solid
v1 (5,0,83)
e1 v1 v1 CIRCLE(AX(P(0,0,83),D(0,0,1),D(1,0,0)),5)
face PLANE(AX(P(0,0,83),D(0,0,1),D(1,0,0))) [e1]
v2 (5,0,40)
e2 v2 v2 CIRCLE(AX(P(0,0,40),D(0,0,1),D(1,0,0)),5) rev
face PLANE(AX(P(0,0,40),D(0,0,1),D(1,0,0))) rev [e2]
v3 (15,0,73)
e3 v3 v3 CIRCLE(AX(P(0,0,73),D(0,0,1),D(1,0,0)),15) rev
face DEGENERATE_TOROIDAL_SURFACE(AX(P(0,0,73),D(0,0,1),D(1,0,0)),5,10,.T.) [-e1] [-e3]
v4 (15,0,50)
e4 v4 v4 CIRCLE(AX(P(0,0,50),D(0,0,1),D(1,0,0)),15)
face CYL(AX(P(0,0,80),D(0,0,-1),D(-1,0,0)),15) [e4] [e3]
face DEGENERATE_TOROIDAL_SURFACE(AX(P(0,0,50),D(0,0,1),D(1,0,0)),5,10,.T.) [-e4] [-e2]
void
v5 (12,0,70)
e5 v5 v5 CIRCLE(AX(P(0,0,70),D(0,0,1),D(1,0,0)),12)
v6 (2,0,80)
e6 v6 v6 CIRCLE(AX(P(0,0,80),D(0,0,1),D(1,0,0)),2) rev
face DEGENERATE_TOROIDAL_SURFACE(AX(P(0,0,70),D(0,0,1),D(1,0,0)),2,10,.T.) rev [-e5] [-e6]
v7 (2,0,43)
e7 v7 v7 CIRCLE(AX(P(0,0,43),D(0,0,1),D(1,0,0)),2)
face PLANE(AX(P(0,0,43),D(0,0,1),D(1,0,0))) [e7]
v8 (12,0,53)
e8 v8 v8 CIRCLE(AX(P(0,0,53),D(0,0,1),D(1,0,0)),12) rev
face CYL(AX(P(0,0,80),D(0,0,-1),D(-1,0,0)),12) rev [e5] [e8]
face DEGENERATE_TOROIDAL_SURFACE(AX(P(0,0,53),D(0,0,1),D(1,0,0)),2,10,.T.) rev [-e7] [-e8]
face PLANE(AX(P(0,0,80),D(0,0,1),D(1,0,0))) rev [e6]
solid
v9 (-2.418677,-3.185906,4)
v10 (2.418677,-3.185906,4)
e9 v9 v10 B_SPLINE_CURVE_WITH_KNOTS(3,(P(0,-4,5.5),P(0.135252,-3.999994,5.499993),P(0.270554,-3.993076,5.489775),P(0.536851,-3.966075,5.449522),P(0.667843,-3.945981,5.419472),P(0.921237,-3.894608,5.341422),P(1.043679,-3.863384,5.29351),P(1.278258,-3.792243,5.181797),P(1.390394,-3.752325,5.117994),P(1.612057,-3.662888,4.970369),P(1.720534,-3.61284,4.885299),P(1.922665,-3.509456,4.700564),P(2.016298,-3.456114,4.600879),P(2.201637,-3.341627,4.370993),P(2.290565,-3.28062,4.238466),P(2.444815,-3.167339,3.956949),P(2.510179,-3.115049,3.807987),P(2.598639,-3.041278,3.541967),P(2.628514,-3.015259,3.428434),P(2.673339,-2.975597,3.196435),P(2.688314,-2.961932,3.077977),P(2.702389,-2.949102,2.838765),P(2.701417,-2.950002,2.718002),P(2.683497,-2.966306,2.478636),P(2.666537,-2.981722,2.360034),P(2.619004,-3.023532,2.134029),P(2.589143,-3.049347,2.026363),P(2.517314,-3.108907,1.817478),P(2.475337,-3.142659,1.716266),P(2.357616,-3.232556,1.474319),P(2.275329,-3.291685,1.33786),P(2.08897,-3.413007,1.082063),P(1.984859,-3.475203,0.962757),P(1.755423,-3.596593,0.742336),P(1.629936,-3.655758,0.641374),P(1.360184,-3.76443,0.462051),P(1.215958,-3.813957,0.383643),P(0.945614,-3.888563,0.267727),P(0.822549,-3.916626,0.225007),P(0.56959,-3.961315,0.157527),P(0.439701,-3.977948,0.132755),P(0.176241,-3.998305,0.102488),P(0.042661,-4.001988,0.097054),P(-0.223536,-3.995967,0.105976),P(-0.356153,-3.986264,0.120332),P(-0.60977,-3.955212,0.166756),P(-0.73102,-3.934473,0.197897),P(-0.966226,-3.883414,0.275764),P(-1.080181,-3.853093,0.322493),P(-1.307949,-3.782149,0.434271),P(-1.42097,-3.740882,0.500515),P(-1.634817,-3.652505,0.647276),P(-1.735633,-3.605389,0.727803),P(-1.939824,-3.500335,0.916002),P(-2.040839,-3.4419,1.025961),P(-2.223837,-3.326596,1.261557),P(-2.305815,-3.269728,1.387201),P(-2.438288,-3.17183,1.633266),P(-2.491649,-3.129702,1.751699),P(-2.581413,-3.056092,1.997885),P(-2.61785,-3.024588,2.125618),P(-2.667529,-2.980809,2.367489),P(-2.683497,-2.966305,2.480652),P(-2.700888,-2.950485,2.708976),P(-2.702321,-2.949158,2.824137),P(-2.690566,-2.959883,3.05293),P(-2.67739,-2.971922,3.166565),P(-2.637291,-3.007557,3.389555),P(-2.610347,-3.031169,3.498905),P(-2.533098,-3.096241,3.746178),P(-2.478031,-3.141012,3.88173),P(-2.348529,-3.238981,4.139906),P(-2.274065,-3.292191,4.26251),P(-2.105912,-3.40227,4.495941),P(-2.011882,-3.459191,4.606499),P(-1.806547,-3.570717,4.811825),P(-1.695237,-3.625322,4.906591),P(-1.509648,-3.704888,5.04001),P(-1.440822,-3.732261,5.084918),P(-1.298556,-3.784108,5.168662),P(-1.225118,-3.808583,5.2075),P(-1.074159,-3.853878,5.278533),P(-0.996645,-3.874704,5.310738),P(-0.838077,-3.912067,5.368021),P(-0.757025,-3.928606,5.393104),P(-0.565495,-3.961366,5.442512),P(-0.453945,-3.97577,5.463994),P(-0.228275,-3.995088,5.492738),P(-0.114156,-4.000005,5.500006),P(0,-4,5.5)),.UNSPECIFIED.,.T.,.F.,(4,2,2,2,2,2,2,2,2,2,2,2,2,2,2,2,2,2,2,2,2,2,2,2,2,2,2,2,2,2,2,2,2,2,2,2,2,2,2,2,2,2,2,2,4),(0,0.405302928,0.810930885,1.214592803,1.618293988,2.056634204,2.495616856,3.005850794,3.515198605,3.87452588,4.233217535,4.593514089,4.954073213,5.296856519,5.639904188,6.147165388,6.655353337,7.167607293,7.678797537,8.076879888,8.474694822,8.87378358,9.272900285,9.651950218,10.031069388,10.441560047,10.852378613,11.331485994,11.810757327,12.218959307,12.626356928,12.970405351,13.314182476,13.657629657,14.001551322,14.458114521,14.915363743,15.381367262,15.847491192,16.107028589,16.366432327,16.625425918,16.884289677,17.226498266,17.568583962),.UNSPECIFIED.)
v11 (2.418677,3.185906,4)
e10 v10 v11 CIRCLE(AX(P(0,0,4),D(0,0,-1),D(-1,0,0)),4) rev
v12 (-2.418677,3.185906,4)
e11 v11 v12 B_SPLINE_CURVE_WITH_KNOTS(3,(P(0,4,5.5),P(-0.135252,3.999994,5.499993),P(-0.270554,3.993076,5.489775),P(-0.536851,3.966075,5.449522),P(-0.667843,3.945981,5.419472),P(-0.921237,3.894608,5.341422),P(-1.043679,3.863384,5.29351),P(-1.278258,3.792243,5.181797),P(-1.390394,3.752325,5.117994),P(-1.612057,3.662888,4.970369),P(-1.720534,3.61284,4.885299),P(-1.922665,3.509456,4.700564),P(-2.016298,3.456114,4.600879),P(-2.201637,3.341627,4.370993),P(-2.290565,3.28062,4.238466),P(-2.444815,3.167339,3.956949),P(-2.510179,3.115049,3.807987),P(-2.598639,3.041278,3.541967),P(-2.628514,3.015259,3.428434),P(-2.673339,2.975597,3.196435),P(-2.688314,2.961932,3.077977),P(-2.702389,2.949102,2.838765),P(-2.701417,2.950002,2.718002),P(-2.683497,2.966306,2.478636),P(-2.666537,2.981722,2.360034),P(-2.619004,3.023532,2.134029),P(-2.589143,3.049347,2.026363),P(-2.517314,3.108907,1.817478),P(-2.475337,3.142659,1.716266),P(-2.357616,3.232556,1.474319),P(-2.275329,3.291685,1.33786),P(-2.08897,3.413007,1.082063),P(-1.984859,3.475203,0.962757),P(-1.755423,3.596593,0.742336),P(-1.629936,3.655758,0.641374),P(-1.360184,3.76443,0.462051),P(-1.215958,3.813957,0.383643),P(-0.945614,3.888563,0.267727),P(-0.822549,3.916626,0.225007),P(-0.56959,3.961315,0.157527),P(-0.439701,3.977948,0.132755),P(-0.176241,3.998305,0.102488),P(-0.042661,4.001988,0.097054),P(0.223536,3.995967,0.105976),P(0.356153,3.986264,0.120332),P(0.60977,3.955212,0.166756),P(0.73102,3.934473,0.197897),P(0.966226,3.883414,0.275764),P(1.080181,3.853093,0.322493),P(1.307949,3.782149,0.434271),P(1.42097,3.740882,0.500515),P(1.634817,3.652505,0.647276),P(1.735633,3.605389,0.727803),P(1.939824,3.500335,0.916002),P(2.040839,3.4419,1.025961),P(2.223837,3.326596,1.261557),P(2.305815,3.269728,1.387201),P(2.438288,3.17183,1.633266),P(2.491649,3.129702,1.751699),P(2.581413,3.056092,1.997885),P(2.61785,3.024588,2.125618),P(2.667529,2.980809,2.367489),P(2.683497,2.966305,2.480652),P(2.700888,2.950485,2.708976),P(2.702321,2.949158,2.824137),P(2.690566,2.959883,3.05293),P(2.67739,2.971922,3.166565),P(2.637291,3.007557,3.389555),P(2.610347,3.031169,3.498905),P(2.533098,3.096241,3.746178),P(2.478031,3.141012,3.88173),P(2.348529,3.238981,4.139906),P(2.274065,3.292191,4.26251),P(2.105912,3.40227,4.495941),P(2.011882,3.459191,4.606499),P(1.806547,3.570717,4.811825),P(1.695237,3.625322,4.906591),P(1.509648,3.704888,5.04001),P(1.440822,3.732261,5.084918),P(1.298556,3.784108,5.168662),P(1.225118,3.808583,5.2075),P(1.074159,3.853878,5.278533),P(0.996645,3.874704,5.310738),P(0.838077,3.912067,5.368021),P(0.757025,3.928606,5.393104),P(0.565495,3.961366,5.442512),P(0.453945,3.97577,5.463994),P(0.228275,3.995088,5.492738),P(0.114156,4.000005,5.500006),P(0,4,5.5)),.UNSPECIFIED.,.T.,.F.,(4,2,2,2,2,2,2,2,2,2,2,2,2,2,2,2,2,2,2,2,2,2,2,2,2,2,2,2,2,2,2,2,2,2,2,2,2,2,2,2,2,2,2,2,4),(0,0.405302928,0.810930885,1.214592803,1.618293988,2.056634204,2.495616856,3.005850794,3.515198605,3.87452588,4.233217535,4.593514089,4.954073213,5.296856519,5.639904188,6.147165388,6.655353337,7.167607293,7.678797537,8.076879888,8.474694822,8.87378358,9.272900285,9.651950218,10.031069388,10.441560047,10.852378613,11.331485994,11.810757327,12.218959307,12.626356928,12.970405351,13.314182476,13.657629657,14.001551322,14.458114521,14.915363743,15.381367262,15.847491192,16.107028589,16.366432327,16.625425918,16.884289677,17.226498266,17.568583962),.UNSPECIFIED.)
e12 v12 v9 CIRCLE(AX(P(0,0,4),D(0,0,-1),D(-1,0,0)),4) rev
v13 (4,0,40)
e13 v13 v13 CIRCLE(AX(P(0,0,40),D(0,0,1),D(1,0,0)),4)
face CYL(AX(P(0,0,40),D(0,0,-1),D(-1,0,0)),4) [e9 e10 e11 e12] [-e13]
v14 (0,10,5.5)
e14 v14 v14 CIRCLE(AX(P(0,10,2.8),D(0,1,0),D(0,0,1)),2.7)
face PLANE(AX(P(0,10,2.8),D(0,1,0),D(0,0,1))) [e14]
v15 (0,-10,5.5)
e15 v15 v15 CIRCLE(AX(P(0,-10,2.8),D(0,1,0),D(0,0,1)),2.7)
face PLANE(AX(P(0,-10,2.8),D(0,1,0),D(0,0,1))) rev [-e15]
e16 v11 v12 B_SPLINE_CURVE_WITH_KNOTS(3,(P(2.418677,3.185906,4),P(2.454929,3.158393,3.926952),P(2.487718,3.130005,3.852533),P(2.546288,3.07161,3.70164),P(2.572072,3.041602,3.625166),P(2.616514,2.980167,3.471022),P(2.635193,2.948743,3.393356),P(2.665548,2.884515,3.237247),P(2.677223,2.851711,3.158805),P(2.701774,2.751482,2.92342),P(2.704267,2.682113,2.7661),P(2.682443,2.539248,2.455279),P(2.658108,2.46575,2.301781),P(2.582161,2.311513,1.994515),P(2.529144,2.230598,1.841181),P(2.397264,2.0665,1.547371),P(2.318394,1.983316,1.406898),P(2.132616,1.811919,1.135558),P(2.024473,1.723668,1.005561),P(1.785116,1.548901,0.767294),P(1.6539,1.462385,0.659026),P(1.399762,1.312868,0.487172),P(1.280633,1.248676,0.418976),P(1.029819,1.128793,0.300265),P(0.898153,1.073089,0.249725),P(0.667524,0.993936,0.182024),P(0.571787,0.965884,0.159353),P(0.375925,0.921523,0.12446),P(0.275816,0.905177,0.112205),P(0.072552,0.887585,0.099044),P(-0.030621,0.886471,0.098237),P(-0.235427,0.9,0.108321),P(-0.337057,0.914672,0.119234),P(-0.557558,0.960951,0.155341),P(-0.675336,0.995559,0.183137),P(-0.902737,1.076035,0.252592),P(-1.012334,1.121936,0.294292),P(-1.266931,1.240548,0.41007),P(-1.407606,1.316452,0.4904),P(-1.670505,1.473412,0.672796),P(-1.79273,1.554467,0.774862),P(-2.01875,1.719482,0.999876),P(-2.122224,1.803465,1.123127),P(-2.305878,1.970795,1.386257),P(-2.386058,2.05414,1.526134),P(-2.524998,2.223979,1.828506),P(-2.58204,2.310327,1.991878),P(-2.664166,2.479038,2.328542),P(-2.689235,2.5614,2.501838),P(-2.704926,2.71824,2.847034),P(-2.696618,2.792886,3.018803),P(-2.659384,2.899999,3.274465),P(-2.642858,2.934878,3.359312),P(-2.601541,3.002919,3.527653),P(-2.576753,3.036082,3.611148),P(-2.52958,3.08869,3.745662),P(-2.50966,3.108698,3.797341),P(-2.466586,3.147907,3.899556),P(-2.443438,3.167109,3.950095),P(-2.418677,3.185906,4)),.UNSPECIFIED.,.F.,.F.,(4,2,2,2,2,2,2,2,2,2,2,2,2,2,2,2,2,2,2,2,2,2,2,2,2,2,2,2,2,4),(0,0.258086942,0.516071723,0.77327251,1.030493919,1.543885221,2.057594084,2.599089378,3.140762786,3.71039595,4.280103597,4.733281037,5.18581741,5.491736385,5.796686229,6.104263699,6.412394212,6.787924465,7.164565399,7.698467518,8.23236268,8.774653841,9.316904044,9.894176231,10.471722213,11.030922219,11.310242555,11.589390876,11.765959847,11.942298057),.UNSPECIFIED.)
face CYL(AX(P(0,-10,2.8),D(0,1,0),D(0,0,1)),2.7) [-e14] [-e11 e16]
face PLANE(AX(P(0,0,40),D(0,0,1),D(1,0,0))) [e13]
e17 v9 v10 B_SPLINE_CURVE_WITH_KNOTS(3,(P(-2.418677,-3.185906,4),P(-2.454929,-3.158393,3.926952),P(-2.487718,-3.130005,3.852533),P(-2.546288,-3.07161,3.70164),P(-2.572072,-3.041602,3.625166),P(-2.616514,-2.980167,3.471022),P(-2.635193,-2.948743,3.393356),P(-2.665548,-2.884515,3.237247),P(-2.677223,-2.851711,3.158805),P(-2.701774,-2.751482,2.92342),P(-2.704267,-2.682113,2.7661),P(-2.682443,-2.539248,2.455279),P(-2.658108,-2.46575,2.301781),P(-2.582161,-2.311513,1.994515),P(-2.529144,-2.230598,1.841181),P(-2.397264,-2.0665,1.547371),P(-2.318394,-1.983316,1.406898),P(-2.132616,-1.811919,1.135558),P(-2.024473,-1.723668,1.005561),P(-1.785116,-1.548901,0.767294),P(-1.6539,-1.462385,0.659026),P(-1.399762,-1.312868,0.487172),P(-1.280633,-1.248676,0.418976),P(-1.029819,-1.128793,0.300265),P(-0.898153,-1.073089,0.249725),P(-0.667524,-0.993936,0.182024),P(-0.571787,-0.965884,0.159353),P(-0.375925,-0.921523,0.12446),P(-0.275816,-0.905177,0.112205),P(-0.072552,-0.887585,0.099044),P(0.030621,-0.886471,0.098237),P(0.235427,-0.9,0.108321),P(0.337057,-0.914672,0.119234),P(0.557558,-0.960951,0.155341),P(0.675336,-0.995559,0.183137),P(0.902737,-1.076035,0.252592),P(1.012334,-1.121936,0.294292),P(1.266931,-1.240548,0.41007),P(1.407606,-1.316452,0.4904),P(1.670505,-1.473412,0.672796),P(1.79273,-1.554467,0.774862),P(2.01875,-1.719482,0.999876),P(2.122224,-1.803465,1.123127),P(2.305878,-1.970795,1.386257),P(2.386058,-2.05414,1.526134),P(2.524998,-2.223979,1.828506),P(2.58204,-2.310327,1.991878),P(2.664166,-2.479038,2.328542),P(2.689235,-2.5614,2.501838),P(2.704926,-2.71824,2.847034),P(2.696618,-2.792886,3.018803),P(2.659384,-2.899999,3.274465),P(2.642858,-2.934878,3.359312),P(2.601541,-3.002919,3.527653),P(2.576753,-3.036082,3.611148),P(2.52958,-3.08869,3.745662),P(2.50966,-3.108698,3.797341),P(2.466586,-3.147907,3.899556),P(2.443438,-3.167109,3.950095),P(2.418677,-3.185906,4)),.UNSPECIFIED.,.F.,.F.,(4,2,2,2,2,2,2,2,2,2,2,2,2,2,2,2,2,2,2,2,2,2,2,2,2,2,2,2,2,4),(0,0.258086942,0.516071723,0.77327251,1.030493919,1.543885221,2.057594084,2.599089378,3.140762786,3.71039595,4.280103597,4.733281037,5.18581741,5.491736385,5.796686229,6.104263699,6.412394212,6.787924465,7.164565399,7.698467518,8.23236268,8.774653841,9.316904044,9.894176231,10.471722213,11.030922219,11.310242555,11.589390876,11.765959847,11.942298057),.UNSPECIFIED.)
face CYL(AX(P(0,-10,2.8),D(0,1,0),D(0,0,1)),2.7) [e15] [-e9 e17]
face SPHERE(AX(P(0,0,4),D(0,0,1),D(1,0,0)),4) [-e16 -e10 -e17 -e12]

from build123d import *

# Parameters (mm, degrees)
SKETCH1_R                = 4
BOSS_EXTRUDE1_DEPTH      = 40
BOSS_EXTRUDE2_START      = 40
SKETCH1_3_R              = 15
SKETCH1_3_R_2            = 12
BOSS_EXTRUDE2_DEPTH      = 40
BOSS_EXTRUDE3_START      = 40
SKETCH1_4_R              = 12
SKETCH1_4_R_2            = 4
BOSS_EXTRUDE3_DEPTH      = 3
FILLET1_R                = 10
FILLET2_R                = 10
BOSS_EXTRUDE4_START      = 80
SKETCH1_5_R              = 15
SKETCH1_5_R_2            = 12
SKETCH1_5_R_3            = 4
BOSS_EXTRUDE4_DEPTH      = 3
FILLET5_R                = 10
FILLET6_R                = 10
BOSS_EXTRUDE5_DEPTH      = 10
BOSS_EXTRUDE5_DEPTH_BACK = 10
SKETCH2_R                = 2.7
FILLET7_R                = 4


with BuildPart() as part:
    # Sketch1 → Boss-Extrude1 (new body)
    with BuildSketch(Plane.XY):
        Circle(SKETCH1_R)
    extrude(amount=BOSS_EXTRUDE1_DEPTH)

    # Sketch2 → Boss-Extrude5 (add, two sides: drawn at the far end of the back side and taken through both)
    with BuildSketch(Plane(origin=(0, 0, 0), x_dir=(1, 0, 0), z_dir=(0, 1, 0)).offset(-BOSS_EXTRUDE5_DEPTH_BACK)):
        with Locations(Location((0, -2.8, 0), (0, 0, 270))):
            Circle(SKETCH2_R)
    extrude(amount=BOSS_EXTRUDE5_DEPTH + BOSS_EXTRUDE5_DEPTH_BACK)

    # Fillet7
    # the kernel refuses this fillet: 4 mm, written as the material it takes off along each edge
    with BuildSketch(Plane(origin=(0, 0, 0), x_dir=(1, 0, 0), z_dir=(0, -1, 0))) as fillet7_piece_1_section:
        with BuildLine():
            CenterArc((4 - FILLET7_R, FILLET7_R), FILLET7_R, 270, 90)
            Line((4 - FILLET7_R, 0), (4, 0))
            Line((4, 0), (4, FILLET7_R))
        make_face()
    fillet7_piece_1 = revolve(axis=Axis((0, 0, 0), (0, 0, 1)), mode=Mode.PRIVATE)
    fillet7_piece_1 = fillet7_piece_1 - Plane(origin=(0, 0, 2.8), x_dir=(0, 0, 1), z_dir=(0, -1, 0)) * Cylinder(2.7, 16, mode=Mode.PRIVATE)
    add(fillet7_piece_1, mode=Mode.SUBTRACT)


with BuildPart() as body_2:
    # Sketch1<3> → Boss-Extrude2 (new body)
    with BuildSketch(Plane.XY.offset(BOSS_EXTRUDE2_START)):
        Circle(SKETCH1_3_R)
        Circle(SKETCH1_3_R_2, mode=Mode.SUBTRACT)
    extrude(amount=BOSS_EXTRUDE2_DEPTH)

    # Sketch1<4> → Boss-Extrude3 (add)
    # profile 1 of 2: a face of its own
    with BuildSketch(Plane.XY.offset(BOSS_EXTRUDE3_START)):
        Circle(SKETCH1_4_R)
        Circle(SKETCH1_4_R_2, mode=Mode.SUBTRACT)
    # profile 2 of 2: a face of its own
    with BuildSketch(Plane.XY.offset(BOSS_EXTRUDE3_START)):
        Circle(SKETCH1_4_R_2)
    extrude(amount=BOSS_EXTRUDE3_DEPTH)

    # Fillet1
    fillet1_edges = [body_2.edges().sort_by_distance(p)[0] for p in [
        (-15, 0, 40),
    ]]
    fillet(fillet1_edges, radius=FILLET1_R)

    # Fillet2
    fillet2_edges = [body_2.edges().sort_by_distance(p)[0] for p in [
        (-12, 0, 43),
    ]]
    fillet(fillet2_edges, radius=FILLET2_R)

    # Sketch1<5> → Boss-Extrude4 (add)
    # profile 1 of 3: a face of its own
    with BuildSketch(Plane.XY.offset(BOSS_EXTRUDE4_START)):
        Circle(SKETCH1_5_R)
        Circle(SKETCH1_5_R_2, mode=Mode.SUBTRACT)
    # profile 2 of 3: a face of its own
    with BuildSketch(Plane.XY.offset(BOSS_EXTRUDE4_START)):
        Circle(SKETCH1_5_R_2)
        Circle(SKETCH1_5_R_3, mode=Mode.SUBTRACT)
    # profile 3 of 3: a face of its own
    with BuildSketch(Plane.XY.offset(BOSS_EXTRUDE4_START)):
        Circle(SKETCH1_5_R_3)
    extrude(amount=BOSS_EXTRUDE4_DEPTH)

    # Fillet5
    fillet5_edges = [body_2.edges().sort_by_distance(p)[0] for p in [
        (-12, 0, 80),
    ]]
    fillet(fillet5_edges, radius=FILLET5_R)

    # Fillet6
    fillet6_edges = [body_2.edges().sort_by_distance(p)[0] for p in [
        (-15, 0, 83),
    ]]
    fillet(fillet6_edges, radius=FILLET6_R)


solid = Compound([part.part, body_2.part])
